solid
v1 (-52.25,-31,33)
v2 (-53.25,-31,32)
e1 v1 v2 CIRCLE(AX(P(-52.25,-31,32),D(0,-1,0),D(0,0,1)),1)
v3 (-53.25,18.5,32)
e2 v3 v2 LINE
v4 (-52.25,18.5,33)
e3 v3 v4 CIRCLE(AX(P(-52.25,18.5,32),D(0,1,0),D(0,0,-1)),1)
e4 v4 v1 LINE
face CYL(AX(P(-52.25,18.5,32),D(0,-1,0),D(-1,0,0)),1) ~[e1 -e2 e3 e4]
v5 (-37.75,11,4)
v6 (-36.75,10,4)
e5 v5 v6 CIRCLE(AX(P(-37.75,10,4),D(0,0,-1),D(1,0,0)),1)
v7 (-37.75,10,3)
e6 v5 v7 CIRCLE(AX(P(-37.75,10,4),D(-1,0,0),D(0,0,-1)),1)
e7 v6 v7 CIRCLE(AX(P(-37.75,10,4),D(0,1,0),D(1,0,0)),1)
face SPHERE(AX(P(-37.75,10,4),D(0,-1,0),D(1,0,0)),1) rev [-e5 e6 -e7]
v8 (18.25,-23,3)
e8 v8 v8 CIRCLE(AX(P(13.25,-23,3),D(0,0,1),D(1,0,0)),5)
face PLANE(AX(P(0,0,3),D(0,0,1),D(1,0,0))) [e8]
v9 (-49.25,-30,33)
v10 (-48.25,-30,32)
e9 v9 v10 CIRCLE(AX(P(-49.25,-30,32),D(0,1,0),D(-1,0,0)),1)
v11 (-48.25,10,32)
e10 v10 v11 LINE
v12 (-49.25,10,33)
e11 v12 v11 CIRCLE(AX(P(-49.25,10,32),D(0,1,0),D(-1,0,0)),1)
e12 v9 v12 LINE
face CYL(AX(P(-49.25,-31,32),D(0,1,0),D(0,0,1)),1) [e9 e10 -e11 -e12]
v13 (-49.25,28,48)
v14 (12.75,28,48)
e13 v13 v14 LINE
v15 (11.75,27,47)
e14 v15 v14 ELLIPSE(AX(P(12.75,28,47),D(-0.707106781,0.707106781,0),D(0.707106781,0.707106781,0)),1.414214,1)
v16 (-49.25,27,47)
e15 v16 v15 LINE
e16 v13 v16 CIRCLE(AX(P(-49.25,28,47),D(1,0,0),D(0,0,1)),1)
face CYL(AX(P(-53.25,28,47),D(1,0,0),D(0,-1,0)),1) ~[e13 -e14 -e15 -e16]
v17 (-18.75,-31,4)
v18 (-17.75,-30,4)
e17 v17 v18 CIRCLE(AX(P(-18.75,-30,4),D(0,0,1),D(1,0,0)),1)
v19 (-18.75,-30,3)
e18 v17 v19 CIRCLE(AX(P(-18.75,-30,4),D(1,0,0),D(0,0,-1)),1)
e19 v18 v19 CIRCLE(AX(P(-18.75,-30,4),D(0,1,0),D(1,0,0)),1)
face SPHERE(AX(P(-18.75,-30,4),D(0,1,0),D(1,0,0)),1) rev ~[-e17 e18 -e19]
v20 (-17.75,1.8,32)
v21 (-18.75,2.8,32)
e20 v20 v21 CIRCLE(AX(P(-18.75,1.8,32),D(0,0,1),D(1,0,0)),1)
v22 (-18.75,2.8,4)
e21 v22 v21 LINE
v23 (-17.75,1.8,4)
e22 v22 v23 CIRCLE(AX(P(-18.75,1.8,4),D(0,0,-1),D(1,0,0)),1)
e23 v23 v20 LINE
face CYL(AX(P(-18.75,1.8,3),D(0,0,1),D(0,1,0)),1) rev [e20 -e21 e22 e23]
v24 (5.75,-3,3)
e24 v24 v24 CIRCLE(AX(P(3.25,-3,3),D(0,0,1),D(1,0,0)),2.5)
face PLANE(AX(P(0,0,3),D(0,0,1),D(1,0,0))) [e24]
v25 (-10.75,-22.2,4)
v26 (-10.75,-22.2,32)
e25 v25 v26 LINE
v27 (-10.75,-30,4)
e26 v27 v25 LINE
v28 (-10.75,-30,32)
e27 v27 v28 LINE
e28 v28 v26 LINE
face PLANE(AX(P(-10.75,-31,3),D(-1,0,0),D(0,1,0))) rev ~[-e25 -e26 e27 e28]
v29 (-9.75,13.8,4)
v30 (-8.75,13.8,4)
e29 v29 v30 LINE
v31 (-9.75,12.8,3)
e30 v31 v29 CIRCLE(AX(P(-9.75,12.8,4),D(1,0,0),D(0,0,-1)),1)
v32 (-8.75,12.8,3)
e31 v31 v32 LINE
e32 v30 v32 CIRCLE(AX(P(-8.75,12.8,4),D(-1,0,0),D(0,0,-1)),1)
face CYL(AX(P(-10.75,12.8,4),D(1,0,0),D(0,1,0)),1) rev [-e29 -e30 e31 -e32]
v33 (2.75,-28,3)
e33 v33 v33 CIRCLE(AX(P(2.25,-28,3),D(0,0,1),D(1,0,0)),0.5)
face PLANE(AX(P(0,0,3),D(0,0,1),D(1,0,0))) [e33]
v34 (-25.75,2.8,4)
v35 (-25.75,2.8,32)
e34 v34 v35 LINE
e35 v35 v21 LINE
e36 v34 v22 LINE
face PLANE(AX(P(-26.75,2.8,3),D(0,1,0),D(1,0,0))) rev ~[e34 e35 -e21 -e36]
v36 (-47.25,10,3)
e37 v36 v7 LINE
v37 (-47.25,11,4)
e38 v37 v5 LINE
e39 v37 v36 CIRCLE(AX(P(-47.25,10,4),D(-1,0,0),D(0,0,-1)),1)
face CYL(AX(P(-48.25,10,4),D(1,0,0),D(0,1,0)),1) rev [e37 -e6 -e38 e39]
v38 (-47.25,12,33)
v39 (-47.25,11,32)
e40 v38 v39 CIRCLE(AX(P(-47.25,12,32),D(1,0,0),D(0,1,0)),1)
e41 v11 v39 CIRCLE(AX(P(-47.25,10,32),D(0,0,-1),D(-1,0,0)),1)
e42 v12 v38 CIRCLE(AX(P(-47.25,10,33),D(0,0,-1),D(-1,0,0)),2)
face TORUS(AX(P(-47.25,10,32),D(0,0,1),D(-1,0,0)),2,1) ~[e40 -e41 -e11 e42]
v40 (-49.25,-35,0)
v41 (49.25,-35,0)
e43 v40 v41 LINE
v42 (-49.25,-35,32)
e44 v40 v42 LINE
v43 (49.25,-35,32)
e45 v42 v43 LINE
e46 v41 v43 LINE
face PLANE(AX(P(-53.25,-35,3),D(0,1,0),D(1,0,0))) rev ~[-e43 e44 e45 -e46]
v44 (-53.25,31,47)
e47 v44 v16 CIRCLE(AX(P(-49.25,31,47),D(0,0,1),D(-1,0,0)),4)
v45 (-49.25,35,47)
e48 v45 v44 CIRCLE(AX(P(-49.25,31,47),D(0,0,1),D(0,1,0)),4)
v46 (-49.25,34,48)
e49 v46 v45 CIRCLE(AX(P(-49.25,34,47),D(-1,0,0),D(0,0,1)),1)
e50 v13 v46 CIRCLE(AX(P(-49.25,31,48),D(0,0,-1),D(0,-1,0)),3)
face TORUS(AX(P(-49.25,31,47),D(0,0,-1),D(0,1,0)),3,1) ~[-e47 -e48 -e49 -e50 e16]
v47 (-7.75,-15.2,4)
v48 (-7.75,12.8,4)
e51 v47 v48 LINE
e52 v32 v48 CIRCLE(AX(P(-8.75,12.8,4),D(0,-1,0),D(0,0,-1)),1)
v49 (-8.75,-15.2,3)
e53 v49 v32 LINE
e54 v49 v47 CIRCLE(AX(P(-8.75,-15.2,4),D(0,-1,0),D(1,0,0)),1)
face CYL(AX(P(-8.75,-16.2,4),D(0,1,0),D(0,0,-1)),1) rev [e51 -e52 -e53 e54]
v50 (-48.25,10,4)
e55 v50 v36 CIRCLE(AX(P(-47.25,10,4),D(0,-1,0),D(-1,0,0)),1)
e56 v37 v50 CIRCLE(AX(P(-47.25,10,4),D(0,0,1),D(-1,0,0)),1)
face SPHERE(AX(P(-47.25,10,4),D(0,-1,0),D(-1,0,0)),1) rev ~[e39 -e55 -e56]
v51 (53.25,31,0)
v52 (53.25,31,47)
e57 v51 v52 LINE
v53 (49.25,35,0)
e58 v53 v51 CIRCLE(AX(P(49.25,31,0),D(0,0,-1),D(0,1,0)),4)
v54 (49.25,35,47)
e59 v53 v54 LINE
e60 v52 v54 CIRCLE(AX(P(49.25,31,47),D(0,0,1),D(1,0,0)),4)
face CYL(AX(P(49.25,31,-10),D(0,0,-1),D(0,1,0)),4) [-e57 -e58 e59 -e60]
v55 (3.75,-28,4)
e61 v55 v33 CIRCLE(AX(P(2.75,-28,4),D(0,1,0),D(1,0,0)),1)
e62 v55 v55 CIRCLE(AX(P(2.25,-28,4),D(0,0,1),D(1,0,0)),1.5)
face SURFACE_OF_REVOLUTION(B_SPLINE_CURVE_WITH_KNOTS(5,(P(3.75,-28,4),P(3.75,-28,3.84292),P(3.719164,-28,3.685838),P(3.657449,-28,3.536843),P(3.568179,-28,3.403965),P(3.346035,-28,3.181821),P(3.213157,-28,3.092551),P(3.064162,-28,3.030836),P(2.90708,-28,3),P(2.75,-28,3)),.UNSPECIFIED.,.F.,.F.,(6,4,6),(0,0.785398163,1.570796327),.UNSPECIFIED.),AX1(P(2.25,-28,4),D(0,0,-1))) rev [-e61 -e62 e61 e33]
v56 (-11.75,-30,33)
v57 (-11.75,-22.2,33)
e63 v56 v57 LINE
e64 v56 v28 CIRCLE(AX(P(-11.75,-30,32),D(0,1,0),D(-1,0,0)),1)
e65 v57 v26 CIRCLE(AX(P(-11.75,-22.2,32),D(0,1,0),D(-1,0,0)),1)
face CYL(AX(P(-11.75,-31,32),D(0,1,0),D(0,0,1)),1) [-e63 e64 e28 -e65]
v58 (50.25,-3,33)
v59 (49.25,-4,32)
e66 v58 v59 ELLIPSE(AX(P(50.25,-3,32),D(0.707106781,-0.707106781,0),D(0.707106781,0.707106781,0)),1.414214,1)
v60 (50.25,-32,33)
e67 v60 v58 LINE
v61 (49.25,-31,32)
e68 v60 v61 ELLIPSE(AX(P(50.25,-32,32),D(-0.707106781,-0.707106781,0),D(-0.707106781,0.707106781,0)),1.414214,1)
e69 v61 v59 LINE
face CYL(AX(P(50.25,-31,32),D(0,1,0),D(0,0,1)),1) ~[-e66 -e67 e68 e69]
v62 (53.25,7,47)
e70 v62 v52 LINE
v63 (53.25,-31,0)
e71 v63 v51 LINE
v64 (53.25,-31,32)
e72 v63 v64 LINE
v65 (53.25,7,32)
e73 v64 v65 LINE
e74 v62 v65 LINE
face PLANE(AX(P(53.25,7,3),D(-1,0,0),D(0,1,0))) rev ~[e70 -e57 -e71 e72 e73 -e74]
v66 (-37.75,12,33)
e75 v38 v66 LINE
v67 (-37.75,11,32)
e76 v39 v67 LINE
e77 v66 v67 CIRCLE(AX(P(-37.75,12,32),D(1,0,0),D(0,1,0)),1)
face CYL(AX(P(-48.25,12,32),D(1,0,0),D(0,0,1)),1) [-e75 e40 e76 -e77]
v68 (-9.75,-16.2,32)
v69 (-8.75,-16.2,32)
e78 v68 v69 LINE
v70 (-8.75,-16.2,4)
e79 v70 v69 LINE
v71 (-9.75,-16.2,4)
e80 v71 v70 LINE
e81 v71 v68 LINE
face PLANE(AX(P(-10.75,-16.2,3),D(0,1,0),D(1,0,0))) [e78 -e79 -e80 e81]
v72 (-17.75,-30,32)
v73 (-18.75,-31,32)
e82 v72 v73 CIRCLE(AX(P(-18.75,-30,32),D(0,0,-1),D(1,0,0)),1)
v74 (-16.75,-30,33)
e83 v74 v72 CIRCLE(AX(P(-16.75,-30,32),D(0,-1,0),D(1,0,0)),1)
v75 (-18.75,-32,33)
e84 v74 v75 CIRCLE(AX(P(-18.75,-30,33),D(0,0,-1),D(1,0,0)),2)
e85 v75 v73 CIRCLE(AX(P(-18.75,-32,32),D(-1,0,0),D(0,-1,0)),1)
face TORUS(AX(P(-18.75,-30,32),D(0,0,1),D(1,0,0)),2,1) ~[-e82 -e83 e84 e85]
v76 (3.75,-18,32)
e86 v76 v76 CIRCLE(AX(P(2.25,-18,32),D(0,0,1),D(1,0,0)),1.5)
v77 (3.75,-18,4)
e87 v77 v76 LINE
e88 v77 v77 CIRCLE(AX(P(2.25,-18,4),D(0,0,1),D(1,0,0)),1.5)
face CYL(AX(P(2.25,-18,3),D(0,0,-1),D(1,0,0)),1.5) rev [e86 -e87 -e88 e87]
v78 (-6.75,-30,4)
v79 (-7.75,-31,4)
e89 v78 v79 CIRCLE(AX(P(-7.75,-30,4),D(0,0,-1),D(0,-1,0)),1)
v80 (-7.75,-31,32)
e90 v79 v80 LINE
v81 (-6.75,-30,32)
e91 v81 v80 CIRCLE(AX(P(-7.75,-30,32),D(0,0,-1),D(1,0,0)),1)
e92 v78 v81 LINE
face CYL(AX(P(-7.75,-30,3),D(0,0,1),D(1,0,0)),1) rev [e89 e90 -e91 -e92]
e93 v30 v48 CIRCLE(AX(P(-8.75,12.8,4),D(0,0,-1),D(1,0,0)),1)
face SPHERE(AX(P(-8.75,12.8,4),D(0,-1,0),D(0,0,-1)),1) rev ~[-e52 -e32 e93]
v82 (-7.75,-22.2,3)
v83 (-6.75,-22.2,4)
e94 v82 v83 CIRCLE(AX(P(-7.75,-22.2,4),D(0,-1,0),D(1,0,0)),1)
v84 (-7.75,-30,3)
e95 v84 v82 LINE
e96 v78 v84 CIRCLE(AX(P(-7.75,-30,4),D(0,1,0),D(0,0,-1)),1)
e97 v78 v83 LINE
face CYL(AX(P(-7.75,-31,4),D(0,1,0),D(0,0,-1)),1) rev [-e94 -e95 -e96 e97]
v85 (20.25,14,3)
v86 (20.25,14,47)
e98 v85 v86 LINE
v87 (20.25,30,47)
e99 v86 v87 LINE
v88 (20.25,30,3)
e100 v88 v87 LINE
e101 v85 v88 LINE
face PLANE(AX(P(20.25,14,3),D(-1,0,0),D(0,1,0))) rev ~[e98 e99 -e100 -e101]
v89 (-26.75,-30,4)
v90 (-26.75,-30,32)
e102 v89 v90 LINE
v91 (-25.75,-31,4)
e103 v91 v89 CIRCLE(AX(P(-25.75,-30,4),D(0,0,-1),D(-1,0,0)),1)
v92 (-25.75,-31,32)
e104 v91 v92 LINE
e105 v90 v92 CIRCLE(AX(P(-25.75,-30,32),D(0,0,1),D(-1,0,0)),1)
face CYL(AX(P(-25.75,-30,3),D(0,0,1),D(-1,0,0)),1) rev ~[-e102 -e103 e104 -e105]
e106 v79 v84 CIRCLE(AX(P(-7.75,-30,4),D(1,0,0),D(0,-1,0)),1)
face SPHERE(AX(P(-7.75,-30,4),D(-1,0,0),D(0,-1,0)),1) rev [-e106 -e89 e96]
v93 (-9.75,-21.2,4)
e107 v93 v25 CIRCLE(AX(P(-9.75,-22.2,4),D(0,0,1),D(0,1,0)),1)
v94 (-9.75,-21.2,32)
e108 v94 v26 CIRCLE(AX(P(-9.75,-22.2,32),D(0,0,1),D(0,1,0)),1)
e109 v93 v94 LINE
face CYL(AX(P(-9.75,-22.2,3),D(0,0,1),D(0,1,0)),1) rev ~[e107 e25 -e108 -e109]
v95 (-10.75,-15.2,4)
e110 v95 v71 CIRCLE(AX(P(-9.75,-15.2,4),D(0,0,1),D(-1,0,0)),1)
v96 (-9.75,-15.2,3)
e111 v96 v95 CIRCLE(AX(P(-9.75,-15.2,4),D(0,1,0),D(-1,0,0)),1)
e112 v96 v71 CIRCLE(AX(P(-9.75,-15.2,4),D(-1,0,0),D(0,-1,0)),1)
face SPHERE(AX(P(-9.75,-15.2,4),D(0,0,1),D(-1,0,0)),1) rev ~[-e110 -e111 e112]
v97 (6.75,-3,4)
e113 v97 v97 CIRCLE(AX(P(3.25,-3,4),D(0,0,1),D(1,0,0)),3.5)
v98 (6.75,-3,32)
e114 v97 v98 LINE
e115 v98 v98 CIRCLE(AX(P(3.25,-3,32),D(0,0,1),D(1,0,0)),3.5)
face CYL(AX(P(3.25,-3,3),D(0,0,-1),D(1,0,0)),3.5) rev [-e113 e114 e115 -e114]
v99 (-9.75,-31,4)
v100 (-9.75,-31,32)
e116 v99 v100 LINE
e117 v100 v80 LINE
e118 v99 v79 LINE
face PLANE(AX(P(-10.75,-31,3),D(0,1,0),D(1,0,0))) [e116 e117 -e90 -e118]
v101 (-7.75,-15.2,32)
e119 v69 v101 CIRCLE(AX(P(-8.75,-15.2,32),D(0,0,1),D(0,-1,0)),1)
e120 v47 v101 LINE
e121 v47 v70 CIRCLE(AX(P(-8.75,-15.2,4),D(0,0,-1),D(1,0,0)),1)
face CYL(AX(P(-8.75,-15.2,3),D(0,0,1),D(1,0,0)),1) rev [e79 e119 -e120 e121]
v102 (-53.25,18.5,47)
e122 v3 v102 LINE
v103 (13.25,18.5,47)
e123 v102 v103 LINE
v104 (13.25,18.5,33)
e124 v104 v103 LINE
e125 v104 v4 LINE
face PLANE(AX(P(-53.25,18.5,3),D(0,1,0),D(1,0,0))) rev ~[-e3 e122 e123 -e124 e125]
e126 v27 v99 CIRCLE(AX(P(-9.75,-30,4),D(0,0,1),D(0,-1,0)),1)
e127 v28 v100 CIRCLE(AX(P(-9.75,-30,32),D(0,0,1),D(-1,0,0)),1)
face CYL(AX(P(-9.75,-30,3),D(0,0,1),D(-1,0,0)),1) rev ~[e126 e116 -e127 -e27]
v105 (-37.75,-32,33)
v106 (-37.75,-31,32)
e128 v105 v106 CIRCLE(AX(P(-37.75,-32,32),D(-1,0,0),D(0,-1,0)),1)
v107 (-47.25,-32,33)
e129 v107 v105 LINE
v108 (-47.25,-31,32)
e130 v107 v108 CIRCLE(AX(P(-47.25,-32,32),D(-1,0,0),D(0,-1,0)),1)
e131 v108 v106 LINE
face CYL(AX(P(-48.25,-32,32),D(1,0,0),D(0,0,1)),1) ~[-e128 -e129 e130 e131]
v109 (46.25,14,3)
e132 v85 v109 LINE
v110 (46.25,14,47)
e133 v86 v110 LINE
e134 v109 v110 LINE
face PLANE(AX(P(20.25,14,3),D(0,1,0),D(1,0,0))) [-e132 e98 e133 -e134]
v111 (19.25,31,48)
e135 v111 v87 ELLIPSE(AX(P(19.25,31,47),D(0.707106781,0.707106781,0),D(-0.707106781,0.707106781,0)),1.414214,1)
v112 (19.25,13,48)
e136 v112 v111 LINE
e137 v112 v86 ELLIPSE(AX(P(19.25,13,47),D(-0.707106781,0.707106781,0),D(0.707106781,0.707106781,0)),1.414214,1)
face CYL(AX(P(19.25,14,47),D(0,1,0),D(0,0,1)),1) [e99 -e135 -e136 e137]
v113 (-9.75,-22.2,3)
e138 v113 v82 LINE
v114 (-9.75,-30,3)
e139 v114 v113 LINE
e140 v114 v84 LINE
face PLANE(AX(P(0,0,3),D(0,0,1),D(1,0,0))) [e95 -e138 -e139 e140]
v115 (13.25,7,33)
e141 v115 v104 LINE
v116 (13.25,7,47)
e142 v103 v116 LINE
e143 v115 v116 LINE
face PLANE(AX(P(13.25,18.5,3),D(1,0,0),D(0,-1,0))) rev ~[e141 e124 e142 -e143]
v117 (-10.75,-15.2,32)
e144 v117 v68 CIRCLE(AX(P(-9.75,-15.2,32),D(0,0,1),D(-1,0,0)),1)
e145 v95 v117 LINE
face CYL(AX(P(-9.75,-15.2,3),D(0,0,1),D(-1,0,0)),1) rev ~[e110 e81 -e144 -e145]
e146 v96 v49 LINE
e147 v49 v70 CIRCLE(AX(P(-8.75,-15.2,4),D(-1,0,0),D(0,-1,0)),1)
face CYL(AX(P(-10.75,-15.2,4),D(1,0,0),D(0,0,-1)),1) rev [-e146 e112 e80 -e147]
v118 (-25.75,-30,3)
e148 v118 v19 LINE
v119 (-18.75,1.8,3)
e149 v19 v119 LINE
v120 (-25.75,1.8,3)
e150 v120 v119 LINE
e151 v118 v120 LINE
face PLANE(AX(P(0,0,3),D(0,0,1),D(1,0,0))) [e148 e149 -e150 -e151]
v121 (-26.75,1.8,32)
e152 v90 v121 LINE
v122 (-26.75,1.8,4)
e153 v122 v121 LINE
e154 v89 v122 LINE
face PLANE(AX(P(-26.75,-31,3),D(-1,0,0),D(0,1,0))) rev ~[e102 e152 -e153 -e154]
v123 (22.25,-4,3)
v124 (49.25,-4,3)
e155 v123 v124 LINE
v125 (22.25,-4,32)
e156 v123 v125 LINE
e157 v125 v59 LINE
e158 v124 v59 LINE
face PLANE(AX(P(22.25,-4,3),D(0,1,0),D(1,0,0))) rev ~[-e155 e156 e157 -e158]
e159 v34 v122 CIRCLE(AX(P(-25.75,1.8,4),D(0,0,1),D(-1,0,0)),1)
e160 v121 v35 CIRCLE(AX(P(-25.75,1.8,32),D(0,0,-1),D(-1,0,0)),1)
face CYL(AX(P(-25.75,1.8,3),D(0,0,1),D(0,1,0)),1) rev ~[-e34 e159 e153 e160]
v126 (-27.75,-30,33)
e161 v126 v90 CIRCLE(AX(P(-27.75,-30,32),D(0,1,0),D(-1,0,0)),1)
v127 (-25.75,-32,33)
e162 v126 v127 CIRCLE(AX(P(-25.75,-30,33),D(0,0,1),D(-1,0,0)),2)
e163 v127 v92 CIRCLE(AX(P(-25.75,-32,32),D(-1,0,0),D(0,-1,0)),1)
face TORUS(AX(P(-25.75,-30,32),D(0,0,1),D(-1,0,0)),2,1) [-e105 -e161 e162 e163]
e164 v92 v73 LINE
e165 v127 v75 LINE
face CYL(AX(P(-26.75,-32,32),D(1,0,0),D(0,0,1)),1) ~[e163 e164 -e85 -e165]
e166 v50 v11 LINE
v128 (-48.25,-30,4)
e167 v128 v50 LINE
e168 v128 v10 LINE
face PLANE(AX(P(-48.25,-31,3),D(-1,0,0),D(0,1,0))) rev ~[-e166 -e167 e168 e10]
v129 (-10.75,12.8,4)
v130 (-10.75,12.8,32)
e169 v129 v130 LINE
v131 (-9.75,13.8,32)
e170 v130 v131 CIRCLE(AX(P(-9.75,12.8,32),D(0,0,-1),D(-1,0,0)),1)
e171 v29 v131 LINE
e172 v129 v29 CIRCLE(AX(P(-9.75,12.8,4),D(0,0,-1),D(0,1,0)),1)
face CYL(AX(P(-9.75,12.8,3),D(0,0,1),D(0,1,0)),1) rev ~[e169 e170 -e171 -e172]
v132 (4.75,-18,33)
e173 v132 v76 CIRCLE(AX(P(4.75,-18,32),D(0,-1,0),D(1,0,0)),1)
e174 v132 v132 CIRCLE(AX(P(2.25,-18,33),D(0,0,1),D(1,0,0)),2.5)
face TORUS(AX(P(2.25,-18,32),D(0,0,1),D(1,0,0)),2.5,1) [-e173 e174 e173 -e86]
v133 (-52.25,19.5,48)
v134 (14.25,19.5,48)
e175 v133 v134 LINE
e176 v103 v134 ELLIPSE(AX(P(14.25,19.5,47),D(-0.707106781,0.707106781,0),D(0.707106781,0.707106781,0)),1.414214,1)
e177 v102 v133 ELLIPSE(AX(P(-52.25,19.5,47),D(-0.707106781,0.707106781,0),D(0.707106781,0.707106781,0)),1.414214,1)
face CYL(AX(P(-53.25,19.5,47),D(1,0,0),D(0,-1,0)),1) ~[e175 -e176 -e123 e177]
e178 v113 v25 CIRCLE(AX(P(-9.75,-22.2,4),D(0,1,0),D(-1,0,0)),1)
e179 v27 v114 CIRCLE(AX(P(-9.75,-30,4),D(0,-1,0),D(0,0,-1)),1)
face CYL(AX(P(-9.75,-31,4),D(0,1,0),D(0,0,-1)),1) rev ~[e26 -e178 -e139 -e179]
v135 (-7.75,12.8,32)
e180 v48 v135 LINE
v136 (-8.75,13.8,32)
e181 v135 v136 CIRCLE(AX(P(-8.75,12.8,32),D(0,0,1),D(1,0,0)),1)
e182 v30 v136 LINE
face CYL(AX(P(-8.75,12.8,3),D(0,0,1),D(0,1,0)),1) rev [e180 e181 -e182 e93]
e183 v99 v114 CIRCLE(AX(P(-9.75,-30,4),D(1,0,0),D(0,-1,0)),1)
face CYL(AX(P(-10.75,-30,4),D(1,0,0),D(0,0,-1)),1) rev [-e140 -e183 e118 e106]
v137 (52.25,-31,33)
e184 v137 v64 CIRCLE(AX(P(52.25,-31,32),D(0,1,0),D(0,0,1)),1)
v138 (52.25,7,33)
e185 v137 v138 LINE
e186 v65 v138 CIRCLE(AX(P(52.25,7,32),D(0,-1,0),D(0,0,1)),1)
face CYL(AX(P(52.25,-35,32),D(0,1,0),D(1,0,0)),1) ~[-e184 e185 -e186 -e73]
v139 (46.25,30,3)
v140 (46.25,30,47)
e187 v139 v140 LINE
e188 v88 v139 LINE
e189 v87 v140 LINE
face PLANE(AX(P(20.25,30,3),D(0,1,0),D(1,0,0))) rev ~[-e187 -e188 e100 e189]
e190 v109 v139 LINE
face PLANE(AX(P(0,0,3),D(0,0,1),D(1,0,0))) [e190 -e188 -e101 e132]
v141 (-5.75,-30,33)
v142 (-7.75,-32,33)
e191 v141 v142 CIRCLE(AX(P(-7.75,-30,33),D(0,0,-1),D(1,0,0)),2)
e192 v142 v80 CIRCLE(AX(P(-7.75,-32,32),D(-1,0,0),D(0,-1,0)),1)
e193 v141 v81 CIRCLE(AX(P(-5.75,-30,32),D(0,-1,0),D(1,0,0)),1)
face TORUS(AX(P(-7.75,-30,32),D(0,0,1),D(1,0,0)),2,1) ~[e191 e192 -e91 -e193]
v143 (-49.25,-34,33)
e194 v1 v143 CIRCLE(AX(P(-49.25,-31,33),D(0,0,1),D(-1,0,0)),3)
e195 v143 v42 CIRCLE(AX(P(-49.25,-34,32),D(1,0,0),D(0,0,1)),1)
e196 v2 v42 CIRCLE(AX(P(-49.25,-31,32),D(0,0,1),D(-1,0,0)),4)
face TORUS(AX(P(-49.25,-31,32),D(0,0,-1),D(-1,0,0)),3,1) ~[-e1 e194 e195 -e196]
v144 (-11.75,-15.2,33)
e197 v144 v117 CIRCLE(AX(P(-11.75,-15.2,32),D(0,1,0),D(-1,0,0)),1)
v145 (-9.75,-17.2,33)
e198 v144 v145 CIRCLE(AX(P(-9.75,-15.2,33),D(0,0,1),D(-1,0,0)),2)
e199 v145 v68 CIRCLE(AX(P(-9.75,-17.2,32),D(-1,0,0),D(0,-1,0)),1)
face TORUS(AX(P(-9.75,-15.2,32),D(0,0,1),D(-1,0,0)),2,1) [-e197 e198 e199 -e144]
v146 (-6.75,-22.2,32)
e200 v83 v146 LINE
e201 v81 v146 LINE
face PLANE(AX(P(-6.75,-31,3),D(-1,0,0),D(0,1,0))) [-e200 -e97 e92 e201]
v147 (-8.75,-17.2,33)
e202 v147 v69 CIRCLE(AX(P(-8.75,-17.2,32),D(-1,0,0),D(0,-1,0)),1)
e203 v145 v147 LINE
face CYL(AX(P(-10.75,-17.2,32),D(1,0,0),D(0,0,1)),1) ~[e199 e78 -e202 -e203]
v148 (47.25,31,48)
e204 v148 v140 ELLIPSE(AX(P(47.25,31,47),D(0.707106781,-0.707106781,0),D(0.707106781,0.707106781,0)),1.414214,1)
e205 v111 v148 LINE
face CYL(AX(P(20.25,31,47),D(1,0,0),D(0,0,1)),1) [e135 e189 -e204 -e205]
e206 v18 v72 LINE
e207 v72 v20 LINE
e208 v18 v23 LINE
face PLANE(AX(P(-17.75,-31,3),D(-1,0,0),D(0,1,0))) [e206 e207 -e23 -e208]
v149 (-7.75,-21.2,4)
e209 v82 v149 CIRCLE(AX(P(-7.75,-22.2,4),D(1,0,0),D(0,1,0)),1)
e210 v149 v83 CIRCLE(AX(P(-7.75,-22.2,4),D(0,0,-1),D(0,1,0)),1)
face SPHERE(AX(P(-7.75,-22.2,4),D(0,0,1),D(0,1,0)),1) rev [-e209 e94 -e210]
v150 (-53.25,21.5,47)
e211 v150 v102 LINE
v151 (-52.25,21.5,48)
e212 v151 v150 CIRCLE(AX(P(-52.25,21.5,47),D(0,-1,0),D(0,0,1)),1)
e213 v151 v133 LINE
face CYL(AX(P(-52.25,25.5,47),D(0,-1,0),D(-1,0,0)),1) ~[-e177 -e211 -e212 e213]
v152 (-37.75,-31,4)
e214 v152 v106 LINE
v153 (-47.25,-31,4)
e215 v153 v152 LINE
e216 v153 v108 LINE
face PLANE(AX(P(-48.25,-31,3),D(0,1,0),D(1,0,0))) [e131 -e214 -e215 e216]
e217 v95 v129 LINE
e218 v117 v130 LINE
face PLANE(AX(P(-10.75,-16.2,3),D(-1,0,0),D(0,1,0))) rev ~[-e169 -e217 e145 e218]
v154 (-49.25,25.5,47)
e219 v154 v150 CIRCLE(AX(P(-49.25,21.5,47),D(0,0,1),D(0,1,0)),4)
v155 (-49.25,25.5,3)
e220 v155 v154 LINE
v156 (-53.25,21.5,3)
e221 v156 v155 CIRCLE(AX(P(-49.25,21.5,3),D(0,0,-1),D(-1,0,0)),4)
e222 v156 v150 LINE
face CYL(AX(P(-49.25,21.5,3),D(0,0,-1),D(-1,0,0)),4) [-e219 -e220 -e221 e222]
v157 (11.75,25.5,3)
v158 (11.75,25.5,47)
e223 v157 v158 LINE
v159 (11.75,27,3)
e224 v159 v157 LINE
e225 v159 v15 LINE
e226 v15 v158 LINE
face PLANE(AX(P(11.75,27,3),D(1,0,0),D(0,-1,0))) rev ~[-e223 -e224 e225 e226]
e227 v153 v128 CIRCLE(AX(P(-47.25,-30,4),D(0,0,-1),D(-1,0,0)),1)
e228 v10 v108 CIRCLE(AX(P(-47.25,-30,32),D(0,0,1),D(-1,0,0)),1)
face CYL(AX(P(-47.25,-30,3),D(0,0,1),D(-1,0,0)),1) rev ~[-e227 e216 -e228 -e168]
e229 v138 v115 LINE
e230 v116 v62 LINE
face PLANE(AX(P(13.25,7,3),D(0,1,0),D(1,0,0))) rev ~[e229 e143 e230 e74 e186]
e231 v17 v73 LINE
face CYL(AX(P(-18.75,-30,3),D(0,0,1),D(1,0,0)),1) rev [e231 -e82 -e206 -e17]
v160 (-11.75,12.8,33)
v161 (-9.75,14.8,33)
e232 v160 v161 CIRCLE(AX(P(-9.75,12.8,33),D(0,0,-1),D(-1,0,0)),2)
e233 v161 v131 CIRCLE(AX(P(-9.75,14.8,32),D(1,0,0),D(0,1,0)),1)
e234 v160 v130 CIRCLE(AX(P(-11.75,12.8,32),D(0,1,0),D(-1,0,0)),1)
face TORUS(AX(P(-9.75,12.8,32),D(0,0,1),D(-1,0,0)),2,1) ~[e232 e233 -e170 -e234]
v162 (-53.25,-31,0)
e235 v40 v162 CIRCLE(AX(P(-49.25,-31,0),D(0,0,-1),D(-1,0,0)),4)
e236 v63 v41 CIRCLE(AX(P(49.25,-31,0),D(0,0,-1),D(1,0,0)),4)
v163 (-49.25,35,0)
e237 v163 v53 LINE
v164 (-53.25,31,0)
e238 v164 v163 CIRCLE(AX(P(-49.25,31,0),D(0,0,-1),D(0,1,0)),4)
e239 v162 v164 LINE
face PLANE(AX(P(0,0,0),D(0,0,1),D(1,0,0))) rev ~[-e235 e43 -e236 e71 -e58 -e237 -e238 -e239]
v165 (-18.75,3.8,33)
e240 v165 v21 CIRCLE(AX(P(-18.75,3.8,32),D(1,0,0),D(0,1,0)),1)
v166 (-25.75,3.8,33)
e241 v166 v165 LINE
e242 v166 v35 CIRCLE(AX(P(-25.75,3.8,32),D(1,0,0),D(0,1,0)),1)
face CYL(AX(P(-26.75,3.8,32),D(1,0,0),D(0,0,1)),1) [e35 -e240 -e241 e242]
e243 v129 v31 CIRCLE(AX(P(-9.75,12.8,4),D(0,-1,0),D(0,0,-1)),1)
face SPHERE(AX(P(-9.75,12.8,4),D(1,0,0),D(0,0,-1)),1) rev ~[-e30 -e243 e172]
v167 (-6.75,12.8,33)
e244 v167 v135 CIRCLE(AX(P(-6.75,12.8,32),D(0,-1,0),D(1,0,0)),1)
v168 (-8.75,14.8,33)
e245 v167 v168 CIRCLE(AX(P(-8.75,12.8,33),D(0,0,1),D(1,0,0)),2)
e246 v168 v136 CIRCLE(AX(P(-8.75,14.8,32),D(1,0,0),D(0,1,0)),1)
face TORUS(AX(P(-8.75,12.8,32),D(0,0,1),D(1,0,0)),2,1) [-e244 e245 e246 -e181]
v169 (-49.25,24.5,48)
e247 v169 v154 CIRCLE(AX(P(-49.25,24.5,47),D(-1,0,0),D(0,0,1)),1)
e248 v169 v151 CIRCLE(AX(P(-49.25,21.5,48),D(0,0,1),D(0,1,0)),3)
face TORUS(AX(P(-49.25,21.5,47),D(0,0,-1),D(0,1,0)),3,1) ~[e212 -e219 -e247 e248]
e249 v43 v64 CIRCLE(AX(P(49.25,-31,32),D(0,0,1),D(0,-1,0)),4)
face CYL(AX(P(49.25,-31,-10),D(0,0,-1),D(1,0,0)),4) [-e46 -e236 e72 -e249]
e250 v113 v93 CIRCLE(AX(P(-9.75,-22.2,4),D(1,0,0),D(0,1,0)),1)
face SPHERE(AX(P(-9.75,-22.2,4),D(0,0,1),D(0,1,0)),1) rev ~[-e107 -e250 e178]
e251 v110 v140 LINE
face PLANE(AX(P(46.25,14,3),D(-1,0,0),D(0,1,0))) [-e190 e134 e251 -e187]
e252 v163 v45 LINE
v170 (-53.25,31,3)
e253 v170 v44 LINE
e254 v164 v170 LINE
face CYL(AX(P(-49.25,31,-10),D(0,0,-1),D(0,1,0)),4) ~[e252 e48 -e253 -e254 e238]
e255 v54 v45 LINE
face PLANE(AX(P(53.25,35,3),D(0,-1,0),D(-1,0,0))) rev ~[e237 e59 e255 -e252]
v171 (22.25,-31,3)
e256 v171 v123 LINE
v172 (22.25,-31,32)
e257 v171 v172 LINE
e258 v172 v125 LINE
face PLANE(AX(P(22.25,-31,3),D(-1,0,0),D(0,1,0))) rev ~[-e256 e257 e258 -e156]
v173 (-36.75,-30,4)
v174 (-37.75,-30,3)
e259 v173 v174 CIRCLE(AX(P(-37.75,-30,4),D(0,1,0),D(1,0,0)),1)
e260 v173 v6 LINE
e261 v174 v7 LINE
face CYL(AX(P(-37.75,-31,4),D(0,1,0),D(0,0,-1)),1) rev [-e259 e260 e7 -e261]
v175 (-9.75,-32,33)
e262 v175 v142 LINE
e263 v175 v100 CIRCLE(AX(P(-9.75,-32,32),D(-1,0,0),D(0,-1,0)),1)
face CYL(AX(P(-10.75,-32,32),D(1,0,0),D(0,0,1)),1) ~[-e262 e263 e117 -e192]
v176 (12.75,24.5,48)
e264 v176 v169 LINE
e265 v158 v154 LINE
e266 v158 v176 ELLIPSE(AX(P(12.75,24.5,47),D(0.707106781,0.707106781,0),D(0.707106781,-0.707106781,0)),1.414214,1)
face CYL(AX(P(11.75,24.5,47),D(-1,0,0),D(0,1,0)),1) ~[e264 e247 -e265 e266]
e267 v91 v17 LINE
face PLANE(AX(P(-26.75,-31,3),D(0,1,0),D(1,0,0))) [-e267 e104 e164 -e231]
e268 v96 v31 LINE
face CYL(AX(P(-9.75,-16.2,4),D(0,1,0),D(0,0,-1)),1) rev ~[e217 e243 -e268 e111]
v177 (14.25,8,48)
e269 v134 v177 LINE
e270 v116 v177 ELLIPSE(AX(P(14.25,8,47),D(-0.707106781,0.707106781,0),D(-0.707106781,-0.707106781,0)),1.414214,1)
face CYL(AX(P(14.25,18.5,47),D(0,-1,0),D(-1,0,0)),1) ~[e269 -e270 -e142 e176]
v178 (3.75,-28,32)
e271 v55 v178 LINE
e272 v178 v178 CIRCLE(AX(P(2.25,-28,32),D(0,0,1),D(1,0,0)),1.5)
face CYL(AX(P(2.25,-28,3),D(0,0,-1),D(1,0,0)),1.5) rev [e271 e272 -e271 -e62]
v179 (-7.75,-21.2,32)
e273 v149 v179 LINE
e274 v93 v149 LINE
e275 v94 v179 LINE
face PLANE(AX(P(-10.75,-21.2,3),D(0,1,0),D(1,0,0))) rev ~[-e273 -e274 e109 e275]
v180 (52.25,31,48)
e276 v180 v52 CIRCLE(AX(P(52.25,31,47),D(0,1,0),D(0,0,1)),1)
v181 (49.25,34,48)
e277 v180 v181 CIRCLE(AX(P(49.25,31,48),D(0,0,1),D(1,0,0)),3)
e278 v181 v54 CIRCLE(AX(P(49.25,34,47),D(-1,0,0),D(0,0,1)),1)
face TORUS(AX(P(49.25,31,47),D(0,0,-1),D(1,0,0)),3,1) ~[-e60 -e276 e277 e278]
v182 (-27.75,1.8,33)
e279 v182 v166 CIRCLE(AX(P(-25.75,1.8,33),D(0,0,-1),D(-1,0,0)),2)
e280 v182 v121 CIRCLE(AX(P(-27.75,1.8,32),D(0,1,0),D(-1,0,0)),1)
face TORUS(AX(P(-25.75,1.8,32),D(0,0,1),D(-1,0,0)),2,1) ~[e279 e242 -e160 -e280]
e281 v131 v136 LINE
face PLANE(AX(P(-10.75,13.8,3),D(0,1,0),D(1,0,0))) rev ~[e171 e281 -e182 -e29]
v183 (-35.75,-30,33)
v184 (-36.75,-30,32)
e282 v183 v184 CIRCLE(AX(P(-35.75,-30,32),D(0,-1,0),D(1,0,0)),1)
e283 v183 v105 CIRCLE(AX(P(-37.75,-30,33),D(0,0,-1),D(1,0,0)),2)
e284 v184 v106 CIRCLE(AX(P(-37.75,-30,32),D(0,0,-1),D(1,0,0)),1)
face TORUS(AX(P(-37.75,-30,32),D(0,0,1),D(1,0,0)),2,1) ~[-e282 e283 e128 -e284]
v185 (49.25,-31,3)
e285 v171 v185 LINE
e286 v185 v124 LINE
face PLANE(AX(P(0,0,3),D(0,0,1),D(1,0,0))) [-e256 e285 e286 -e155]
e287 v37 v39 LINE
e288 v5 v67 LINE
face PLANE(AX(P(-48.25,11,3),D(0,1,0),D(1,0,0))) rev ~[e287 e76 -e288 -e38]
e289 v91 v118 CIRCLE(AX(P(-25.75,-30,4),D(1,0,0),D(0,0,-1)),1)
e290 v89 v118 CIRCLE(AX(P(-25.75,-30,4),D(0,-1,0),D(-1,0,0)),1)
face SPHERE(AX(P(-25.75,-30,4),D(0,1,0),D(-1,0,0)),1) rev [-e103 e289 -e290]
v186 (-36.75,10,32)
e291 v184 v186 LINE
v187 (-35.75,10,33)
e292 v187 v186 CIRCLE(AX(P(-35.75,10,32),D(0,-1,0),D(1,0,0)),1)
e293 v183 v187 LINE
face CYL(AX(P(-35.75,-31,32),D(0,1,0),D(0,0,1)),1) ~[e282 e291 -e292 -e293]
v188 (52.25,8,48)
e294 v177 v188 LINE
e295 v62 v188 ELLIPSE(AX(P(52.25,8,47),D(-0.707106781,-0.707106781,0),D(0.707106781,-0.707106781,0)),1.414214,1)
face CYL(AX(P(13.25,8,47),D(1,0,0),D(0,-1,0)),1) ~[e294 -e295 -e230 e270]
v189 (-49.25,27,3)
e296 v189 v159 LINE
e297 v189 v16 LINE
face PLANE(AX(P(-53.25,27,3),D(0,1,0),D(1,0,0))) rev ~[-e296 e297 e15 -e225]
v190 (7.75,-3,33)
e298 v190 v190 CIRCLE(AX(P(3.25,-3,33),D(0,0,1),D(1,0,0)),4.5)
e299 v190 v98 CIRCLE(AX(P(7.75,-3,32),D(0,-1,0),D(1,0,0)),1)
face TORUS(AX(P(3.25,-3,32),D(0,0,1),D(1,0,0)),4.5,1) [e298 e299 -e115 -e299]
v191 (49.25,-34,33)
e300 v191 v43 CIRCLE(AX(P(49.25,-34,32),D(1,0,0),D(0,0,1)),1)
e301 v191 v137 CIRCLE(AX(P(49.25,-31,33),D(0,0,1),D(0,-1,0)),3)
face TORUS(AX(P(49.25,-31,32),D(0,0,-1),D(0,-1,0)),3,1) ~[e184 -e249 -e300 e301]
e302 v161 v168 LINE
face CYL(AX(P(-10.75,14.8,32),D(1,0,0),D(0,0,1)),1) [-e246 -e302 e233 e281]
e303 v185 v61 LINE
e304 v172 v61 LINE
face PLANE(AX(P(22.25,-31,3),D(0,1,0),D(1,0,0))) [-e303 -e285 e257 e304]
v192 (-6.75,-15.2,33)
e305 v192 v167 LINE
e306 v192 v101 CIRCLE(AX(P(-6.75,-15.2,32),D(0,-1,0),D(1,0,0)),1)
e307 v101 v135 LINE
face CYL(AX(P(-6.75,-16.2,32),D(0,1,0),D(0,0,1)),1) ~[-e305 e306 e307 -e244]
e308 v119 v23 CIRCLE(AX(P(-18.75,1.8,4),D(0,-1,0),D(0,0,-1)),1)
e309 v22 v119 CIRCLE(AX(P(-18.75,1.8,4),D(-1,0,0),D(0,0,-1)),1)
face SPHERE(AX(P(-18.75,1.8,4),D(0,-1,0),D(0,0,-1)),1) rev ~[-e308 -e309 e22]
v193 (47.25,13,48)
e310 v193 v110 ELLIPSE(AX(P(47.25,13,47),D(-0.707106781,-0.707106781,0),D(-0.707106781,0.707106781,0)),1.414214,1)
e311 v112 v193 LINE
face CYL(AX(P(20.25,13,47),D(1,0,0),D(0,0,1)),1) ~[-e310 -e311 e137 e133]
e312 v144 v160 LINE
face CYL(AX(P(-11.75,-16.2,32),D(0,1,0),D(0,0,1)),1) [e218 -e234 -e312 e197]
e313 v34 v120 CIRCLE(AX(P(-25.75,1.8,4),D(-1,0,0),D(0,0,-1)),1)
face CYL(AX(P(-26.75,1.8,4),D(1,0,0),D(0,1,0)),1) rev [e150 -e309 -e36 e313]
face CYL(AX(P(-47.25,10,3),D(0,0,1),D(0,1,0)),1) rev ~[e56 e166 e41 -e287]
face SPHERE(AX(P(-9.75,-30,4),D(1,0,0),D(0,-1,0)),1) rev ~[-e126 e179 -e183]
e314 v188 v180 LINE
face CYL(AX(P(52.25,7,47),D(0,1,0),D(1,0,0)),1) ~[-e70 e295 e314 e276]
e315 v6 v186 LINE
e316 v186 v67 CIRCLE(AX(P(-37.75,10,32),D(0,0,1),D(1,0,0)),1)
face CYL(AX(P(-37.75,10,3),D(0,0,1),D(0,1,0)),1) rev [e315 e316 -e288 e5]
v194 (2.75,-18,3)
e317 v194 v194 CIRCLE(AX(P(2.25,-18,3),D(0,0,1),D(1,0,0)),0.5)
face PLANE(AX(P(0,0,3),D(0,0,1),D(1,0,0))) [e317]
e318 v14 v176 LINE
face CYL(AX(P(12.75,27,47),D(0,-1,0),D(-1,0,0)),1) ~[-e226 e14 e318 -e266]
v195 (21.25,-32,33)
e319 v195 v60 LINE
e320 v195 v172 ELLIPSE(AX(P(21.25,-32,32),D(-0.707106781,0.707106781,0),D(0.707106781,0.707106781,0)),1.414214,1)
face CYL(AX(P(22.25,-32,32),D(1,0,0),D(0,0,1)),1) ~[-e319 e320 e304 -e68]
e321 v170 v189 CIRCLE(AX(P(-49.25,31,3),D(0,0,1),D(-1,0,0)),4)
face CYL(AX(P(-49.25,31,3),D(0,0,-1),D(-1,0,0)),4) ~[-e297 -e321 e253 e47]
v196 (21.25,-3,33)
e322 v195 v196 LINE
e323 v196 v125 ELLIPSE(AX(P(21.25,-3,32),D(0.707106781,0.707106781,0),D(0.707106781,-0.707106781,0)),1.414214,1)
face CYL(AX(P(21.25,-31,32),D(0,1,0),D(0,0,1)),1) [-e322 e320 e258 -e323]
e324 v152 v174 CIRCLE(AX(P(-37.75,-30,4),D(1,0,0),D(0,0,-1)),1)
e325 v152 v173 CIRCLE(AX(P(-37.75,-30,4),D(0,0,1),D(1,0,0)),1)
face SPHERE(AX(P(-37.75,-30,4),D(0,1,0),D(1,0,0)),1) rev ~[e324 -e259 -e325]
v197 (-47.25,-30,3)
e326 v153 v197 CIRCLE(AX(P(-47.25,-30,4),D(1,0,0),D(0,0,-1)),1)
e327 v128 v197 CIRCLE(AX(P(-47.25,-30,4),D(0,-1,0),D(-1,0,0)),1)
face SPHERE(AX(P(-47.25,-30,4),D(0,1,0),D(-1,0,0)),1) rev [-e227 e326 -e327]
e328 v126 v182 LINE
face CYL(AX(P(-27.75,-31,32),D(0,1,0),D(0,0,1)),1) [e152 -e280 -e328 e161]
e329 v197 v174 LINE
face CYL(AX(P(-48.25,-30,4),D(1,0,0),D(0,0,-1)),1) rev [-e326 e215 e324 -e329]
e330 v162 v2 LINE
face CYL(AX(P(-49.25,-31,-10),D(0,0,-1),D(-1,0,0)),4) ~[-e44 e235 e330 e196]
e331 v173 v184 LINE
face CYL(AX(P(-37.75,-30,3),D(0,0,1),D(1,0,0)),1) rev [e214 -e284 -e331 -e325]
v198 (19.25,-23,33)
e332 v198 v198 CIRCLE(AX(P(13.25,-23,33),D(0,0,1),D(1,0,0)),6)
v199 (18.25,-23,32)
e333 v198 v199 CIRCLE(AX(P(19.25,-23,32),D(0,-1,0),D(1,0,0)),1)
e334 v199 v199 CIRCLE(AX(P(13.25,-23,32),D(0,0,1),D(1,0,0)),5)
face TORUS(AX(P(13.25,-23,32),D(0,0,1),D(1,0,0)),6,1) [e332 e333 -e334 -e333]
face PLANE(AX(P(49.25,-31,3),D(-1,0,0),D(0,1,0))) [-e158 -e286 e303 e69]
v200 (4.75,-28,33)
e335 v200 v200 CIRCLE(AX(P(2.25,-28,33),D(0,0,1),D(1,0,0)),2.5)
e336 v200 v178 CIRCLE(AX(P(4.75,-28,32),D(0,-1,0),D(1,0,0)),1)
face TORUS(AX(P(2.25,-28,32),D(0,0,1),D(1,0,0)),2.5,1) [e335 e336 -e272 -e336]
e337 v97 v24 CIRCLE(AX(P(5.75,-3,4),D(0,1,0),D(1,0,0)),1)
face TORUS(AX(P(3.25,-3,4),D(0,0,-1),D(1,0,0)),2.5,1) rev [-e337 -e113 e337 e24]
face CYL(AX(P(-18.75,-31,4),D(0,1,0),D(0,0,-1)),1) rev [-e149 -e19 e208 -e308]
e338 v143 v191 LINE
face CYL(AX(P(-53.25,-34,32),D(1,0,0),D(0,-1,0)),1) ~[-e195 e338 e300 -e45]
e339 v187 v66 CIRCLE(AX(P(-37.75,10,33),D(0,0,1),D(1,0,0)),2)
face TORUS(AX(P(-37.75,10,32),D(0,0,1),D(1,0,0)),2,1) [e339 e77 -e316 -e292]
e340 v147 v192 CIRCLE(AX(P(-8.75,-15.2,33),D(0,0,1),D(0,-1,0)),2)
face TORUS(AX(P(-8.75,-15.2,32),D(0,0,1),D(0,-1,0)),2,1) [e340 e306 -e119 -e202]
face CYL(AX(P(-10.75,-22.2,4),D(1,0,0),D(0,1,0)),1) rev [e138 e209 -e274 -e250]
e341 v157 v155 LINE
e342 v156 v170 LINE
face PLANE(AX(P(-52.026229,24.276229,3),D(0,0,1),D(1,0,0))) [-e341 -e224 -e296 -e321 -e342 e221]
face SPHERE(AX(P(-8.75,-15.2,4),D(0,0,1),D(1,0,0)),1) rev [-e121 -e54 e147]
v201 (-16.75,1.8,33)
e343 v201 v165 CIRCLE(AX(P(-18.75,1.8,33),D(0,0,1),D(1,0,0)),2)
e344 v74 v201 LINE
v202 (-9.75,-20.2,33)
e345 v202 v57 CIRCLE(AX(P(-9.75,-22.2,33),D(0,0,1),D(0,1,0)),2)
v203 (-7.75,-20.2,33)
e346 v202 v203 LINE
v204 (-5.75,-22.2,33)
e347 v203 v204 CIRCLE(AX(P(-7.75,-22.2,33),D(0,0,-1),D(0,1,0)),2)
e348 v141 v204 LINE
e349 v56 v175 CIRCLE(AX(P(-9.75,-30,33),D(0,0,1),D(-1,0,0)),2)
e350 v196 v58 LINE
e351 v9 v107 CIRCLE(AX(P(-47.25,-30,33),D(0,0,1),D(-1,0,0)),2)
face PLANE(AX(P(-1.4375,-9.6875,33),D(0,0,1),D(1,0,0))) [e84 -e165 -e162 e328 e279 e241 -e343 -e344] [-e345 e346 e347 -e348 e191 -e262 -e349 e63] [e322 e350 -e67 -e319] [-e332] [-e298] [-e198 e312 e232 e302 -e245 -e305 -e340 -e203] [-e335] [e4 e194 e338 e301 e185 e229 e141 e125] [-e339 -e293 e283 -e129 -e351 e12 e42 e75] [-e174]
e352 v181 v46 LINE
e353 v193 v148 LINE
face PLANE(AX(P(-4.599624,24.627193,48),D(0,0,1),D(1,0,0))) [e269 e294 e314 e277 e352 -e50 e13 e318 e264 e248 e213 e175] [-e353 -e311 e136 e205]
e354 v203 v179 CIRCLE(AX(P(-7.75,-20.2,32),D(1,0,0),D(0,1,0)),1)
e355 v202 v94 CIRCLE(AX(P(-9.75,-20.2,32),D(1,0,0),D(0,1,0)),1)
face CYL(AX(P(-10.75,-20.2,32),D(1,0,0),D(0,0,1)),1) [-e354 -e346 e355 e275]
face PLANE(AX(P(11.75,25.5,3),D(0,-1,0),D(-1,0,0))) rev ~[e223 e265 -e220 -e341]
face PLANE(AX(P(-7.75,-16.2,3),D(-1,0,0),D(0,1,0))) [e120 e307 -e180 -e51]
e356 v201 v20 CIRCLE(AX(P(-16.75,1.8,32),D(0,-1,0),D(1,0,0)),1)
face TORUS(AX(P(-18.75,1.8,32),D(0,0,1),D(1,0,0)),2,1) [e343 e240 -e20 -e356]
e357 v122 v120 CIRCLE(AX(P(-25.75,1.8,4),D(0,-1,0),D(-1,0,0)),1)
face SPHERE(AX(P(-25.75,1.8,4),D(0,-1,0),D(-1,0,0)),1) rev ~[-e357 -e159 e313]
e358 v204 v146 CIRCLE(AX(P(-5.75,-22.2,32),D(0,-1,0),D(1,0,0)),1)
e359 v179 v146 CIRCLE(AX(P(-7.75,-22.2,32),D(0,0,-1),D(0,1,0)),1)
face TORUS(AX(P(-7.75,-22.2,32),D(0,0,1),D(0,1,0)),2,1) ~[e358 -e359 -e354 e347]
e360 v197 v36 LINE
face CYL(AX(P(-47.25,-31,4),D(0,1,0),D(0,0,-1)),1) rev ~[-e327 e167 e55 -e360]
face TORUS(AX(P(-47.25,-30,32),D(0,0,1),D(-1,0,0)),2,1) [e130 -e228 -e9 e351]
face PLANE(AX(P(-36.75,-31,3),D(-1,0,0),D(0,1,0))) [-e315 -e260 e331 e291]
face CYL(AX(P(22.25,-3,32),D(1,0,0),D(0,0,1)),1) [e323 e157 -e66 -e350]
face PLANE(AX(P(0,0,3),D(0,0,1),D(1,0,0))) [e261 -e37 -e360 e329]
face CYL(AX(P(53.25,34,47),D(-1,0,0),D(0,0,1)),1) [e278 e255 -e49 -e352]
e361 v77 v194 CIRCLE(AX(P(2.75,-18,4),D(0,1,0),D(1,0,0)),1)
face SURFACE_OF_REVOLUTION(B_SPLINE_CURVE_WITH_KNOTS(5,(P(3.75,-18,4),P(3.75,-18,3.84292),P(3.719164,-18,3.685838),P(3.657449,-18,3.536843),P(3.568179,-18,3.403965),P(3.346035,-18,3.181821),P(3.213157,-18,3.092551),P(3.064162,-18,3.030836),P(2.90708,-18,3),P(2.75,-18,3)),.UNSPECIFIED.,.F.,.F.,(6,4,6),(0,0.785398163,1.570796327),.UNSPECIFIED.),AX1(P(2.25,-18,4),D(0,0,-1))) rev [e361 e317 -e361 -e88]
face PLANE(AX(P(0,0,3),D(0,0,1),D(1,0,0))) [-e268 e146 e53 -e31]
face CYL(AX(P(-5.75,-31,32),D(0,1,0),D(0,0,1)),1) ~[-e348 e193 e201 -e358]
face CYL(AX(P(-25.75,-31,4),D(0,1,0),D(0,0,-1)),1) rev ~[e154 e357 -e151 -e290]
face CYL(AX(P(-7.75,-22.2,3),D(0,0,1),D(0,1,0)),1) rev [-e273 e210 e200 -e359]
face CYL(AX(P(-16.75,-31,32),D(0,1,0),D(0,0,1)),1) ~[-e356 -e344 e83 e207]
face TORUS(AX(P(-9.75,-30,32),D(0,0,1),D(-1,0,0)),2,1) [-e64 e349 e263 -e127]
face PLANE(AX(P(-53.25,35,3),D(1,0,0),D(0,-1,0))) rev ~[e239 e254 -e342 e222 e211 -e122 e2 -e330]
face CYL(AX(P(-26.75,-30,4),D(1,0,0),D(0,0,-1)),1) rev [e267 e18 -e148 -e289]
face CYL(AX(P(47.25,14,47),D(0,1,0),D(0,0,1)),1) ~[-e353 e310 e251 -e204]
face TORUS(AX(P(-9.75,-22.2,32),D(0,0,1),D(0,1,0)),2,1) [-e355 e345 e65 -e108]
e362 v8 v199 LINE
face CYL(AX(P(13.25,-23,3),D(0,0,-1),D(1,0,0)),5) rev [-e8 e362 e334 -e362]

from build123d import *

# Parameters (mm, degrees)
F0_W         = 106.5
F0_H         = 70
F1_DEPTH     = 3
F2_W         = 4
F2_H         = 9.8
F2_W_2       = 11.5
F2_H_2       = 42
F2_W_3       = 9
F2_H_3       = 33.8
F2_W_4       = 3
F2_H_4       = 30
F2_R         = 1.5
F2_R_2       = 5
F2_R_3       = 3.5
F2_W_5       = 27
F2_H_5       = 27
F3_DEPTH     = 30
F2_W_6       = 26
F2_H_6       = 16
F4_DEPTH     = 45
F5_R         = 1
F6_T1_DEPTH  = 43
F6_T3_DEPTH  = 58
F6_T5_DEPTH  = 45
F6_T8_ANGLE  = 90
F6_T10_ANGLE = 90
F6_T12_ANGLE = 90
F6_T14_ANGLE = 90
F6_T16_ANGLE = 90
F6_T18_ANGLE = 90


# Not quite as in the source:
# - a fillet or chamfer that OpenCascade refuses, or shapes differently, is made with other operations: its cross-section is extruded or revolved along the edge and cut away or added


with BuildPart() as f1:
    # F0 (on Top) → F1 (new body)
    with BuildSketch(Plane.XY):
        Rectangle(F0_W, F0_H)
    extrude(amount=F1_DEPTH)

    # F2 (on face) → F3 (join)
    with BuildSketch(Plane.XY.offset(3)):
        Polygon((13.25, 18.5), (-53.25, 18.5), (-53.25, -35), (53.25, -35), (53.25, 7), (13.25, 7), align=None)
        with Locations((-8.75, -26.1)):
            Rectangle(F2_W, F2_H, mode=Mode.SUBTRACT)
        with Locations((-42.5, -10)):
            Rectangle(F2_W_2, F2_H_2, mode=Mode.SUBTRACT)
        with Locations((-22.25, -14.1)):
            Rectangle(F2_W_3, F2_H_3, mode=Mode.SUBTRACT)
        with Locations((-9.25, -1.2)):
            Rectangle(F2_W_4, F2_H_4, mode=Mode.SUBTRACT)
        with Locations((2.25, -28)):
            Circle(F2_R, mode=Mode.SUBTRACT)
        with Locations((13.25, -23)):
            Circle(F2_R_2, mode=Mode.SUBTRACT)
        with Locations((2.25, -18)):
            Circle(F2_R, mode=Mode.SUBTRACT)
        with Locations((3.25, -3)):
            Circle(F2_R_3, mode=Mode.SUBTRACT)
        with Locations((35.75, -17.5)):
            Rectangle(F2_W_5, F2_H_5, mode=Mode.SUBTRACT)
    extrude(amount=F3_DEPTH)

    # F2 (on face) → F4 (join)
    with BuildSketch(Plane.XY.offset(3)):
        Polygon((-53.25, 35), (-53.25, 27), (11.75, 27), (11.75, 25.5), (-53.25, 25.5), (-53.25, 18.5), (13.25, 18.5), (13.25, 7), (53.25, 7), (53.25, 35), align=None)
        with Locations((33.25, 22)):
            Rectangle(F2_W_6, F2_H_6, mode=Mode.SUBTRACT)
    extrude(amount=F4_DEPTH)

    # F5
    f5_edges = [f1.edges().sort_by_distance(p)[0] for p in [
        (8.25, -23, 33),
        (35.75, -4, 33),
        (22.25, -17.5, 33),
        (49.25, -17.5, 33),
        (35.75, -31, 33),
        (0.75, -18, 33),
        (-0.25, -3, 33),
        (0.75, -28, 33),
        (-0.25, -3, 3),
        (0.75, -28, 3),
        (0.75, -18, 3),
        (-7.75, -1.2, 33),
        (-6.75, -26.1, 33),
        (-10.75, -1.2, 33),
        (-10.75, -26.1, 33),
        (-9.25, 13.8, 33),
        (-6.75, -21.2, 18),
        (-7.75, -16.2, 18),
        (-8.75, -31, 33),
        (-10.75, -21.2, 18),
        (-9.25, -16.2, 33),
        (-8.75, -21.2, 33),
        (-7.75, -1.2, 3),
        (-8.75, -31, 3),
        (-10.75, -31, 18),
        (-8.75, -21.2, 3),
        (-6.75, -31, 18),
        (-10.75, -26.1, 3),
        (-9.25, 13.8, 3),
        (-10.75, -16.2, 18),
        (-7.75, 13.8, 18),
        (-10.75, -1.2, 3),
        (-10.75, 13.8, 18),
        (-6.75, -26.1, 3),
        (-9.25, -16.2, 3),
        (-17.75, -14.1, 33),
        (-26.75, -14.1, 33),
        (-22.25, -31, 33),
        (-22.25, 2.8, 33),
        (-17.75, -14.1, 3),
        (-26.75, -14.1, 3),
        (-26.75, 2.8, 18),
        (-17.75, -31, 18),
        (-26.75, -31, 18),
        (-22.25, -31, 3),
        (-22.25, 2.8, 3),
        (-17.75, 2.8, 18),
        (-36.75, -10, 33),
        (-48.25, -10, 33),
        (-42.5, -31, 33),
        (-42.5, 11, 33),
        (-36.75, -10, 3),
        (-48.25, -10, 3),
        (-48.25, 11, 18),
        (-36.75, -31, 18),
        (-36.75, 11, 18),
        (-48.25, -31, 18),
        (-42.5, 11, 3),
        (-42.5, -31, 3),
        (-53.25, -8.25, 33),
        (0, -35, 33),
        (53.25, -14, 33),
        (-20, 18.5, 48),
        (13.25, 12.75, 48),
        (33.25, 7, 48),
        (53.25, 21, 48),
        (0, 35, 48),
        (-53.25, 31, 48),
        (-53.25, 22, 48),
        (-20.75, 27, 48),
        (11.75, 26.25, 48),
        (-20.75, 25.5, 48),
        (20.25, 22, 48),
        (33.25, 30, 48),
        (46.25, 22, 48),
        (33.25, 14, 48),
    ]]
    fillet(f5_edges, radius=F5_R)

    # F6: fillet of radius 4 on 6 edges, made by hand

    # F6_s2 → F6_t1 (cut)
    with BuildSketch(Plane.XY.offset(-10)):
        with BuildLine():
            ThreePointArc((53.25, -31), (52.0784271247, -33.8284271247), (49.25, -35))
            Line((49.25, -35), (53.25, -35))
            Line((53.25, -35), (53.25, -31))
        make_face()
        with BuildLine():
            ThreePointArc((-53.25, -31), (-52.0784271247, -33.8284271247), (-49.25, -35))
            Line((-49.25, -35), (-53.25, -35))
            Line((-53.25, -35), (-53.25, -31))
        make_face()
    extrude(amount=F6_T1_DEPTH, mode=Mode.SUBTRACT)

    # F6_s4 → F6_t3 (cut)
    with BuildSketch(Plane.XY.offset(-10)):
        with BuildLine():
            ThreePointArc((-49.25, 35), (-52.0784271247, 33.8284271247), (-53.25, 31))
            Line((-53.25, 31), (-53.25, 35))
            Line((-53.25, 35), (-49.25, 35))
        make_face()
        with BuildLine():
            ThreePointArc((49.25, 35), (52.0784271247, 33.8284271247), (53.25, 31))
            Line((53.25, 31), (53.25, 35))
            Line((53.25, 35), (49.25, 35))
        make_face()
    extrude(amount=F6_T3_DEPTH, mode=Mode.SUBTRACT)

    # F6_s6 → F6_t5 (cut)
    with BuildSketch(Plane.XY.offset(3)):
        with BuildLine():
            ThreePointArc((-53.25, 21.5), (-52.0784271247, 24.3284271247), (-49.25, 25.5))
            Line((-49.25, 25.5), (-53.25, 25.5))
            Line((-53.25, 25.5), (-53.25, 21.5))
        make_face()
        with BuildLine():
            ThreePointArc((-53.25, 31), (-52.0784271247, 28.1715728753), (-49.25, 27))
            Line((-49.25, 27), (-53.25, 27))
            Line((-53.25, 27), (-53.25, 31))
        make_face()
    extrude(amount=F6_T5_DEPTH, mode=Mode.SUBTRACT)

    # F6_s7 → F6_t8 (revolve, cut)
    with BuildSketch(Plane.XZ.offset(-31)):
        with BuildLine():
            ThreePointArc((-52.25, 48), (-52.9571067812, 47.7071067812), (-53.25, 47))
            Line((-53.25, 47), (-53.25, 48))
            Line((-53.25, 48), (-52.25, 48))
        make_face()
    revolve(axis=Axis((-49.25, 31, 48), (0, 0, 1)), revolution_arc=F6_T8_ANGLE, mode=Mode.SUBTRACT)

    # F6_s9 → F6_t10 (revolve, cut)
    with BuildSketch(Plane.YZ.offset(-49.25)):
        with BuildLine():
            ThreePointArc((24.5, 48), (25.2071067812, 47.7071067812), (25.5, 47))
            Line((25.5, 47), (25.5, 48))
            Line((25.5, 48), (24.5, 48))
        make_face()
    revolve(axis=Axis((-49.25, 21.5, 48), (0, 0, 1)), revolution_arc=F6_T10_ANGLE, mode=Mode.SUBTRACT)

    # F6_s11 → F6_t12 (revolve, cut)
    with BuildSketch(Plane.XZ.offset(-31)):
        with BuildLine():
            ThreePointArc((52.25, 48), (52.9571067812, 47.7071067812), (53.25, 47))
            Line((53.25, 47), (53.25, 48))
            Line((53.25, 48), (52.25, 48))
        make_face()
    revolve(axis=Axis((49.25, 31, 48), (0, 0, 1)), revolution_arc=F6_T12_ANGLE, mode=Mode.SUBTRACT)

    # F6_s13 → F6_t14 (revolve, cut)
    with BuildSketch(Plane.YZ.offset(-49.25)):
        with BuildLine():
            ThreePointArc((34, 48), (34.7071067812, 47.7071067812), (35, 47))
            Line((35, 47), (35, 48))
            Line((35, 48), (34, 48))
        make_face()
    revolve(axis=Axis((-49.25, 31, 48), (0, 0, 1)), revolution_arc=F6_T14_ANGLE, mode=Mode.SUBTRACT)

    # F6_s15 → F6_t16 (revolve, cut)
    with BuildSketch(Plane.XZ.offset(31)):
        with BuildLine():
            ThreePointArc((-52.25, 33), (-52.9571067812, 32.7071067812), (-53.25, 32))
            Line((-53.25, 32), (-53.25, 33))
            Line((-53.25, 33), (-52.25, 33))
        make_face()
    revolve(axis=Axis((-49.25, -31, 33), (0, 0, 1)), revolution_arc=F6_T16_ANGLE, mode=Mode.SUBTRACT)

    # F6_s17 → F6_t18 (revolve, cut)
    with BuildSketch(Plane.YZ.offset(49.25)):
        with BuildLine():
            ThreePointArc((-34, 33), (-34.7071067812, 32.7071067812), (-35, 32))
            Line((-35, 32), (-35, 33))
            Line((-35, 33), (-34, 33))
        make_face()
    revolve(axis=Axis((49.25, -31, 33), (0, 0, 1)), revolution_arc=F6_T18_ANGLE, mode=Mode.SUBTRACT)


solid = f1.part
